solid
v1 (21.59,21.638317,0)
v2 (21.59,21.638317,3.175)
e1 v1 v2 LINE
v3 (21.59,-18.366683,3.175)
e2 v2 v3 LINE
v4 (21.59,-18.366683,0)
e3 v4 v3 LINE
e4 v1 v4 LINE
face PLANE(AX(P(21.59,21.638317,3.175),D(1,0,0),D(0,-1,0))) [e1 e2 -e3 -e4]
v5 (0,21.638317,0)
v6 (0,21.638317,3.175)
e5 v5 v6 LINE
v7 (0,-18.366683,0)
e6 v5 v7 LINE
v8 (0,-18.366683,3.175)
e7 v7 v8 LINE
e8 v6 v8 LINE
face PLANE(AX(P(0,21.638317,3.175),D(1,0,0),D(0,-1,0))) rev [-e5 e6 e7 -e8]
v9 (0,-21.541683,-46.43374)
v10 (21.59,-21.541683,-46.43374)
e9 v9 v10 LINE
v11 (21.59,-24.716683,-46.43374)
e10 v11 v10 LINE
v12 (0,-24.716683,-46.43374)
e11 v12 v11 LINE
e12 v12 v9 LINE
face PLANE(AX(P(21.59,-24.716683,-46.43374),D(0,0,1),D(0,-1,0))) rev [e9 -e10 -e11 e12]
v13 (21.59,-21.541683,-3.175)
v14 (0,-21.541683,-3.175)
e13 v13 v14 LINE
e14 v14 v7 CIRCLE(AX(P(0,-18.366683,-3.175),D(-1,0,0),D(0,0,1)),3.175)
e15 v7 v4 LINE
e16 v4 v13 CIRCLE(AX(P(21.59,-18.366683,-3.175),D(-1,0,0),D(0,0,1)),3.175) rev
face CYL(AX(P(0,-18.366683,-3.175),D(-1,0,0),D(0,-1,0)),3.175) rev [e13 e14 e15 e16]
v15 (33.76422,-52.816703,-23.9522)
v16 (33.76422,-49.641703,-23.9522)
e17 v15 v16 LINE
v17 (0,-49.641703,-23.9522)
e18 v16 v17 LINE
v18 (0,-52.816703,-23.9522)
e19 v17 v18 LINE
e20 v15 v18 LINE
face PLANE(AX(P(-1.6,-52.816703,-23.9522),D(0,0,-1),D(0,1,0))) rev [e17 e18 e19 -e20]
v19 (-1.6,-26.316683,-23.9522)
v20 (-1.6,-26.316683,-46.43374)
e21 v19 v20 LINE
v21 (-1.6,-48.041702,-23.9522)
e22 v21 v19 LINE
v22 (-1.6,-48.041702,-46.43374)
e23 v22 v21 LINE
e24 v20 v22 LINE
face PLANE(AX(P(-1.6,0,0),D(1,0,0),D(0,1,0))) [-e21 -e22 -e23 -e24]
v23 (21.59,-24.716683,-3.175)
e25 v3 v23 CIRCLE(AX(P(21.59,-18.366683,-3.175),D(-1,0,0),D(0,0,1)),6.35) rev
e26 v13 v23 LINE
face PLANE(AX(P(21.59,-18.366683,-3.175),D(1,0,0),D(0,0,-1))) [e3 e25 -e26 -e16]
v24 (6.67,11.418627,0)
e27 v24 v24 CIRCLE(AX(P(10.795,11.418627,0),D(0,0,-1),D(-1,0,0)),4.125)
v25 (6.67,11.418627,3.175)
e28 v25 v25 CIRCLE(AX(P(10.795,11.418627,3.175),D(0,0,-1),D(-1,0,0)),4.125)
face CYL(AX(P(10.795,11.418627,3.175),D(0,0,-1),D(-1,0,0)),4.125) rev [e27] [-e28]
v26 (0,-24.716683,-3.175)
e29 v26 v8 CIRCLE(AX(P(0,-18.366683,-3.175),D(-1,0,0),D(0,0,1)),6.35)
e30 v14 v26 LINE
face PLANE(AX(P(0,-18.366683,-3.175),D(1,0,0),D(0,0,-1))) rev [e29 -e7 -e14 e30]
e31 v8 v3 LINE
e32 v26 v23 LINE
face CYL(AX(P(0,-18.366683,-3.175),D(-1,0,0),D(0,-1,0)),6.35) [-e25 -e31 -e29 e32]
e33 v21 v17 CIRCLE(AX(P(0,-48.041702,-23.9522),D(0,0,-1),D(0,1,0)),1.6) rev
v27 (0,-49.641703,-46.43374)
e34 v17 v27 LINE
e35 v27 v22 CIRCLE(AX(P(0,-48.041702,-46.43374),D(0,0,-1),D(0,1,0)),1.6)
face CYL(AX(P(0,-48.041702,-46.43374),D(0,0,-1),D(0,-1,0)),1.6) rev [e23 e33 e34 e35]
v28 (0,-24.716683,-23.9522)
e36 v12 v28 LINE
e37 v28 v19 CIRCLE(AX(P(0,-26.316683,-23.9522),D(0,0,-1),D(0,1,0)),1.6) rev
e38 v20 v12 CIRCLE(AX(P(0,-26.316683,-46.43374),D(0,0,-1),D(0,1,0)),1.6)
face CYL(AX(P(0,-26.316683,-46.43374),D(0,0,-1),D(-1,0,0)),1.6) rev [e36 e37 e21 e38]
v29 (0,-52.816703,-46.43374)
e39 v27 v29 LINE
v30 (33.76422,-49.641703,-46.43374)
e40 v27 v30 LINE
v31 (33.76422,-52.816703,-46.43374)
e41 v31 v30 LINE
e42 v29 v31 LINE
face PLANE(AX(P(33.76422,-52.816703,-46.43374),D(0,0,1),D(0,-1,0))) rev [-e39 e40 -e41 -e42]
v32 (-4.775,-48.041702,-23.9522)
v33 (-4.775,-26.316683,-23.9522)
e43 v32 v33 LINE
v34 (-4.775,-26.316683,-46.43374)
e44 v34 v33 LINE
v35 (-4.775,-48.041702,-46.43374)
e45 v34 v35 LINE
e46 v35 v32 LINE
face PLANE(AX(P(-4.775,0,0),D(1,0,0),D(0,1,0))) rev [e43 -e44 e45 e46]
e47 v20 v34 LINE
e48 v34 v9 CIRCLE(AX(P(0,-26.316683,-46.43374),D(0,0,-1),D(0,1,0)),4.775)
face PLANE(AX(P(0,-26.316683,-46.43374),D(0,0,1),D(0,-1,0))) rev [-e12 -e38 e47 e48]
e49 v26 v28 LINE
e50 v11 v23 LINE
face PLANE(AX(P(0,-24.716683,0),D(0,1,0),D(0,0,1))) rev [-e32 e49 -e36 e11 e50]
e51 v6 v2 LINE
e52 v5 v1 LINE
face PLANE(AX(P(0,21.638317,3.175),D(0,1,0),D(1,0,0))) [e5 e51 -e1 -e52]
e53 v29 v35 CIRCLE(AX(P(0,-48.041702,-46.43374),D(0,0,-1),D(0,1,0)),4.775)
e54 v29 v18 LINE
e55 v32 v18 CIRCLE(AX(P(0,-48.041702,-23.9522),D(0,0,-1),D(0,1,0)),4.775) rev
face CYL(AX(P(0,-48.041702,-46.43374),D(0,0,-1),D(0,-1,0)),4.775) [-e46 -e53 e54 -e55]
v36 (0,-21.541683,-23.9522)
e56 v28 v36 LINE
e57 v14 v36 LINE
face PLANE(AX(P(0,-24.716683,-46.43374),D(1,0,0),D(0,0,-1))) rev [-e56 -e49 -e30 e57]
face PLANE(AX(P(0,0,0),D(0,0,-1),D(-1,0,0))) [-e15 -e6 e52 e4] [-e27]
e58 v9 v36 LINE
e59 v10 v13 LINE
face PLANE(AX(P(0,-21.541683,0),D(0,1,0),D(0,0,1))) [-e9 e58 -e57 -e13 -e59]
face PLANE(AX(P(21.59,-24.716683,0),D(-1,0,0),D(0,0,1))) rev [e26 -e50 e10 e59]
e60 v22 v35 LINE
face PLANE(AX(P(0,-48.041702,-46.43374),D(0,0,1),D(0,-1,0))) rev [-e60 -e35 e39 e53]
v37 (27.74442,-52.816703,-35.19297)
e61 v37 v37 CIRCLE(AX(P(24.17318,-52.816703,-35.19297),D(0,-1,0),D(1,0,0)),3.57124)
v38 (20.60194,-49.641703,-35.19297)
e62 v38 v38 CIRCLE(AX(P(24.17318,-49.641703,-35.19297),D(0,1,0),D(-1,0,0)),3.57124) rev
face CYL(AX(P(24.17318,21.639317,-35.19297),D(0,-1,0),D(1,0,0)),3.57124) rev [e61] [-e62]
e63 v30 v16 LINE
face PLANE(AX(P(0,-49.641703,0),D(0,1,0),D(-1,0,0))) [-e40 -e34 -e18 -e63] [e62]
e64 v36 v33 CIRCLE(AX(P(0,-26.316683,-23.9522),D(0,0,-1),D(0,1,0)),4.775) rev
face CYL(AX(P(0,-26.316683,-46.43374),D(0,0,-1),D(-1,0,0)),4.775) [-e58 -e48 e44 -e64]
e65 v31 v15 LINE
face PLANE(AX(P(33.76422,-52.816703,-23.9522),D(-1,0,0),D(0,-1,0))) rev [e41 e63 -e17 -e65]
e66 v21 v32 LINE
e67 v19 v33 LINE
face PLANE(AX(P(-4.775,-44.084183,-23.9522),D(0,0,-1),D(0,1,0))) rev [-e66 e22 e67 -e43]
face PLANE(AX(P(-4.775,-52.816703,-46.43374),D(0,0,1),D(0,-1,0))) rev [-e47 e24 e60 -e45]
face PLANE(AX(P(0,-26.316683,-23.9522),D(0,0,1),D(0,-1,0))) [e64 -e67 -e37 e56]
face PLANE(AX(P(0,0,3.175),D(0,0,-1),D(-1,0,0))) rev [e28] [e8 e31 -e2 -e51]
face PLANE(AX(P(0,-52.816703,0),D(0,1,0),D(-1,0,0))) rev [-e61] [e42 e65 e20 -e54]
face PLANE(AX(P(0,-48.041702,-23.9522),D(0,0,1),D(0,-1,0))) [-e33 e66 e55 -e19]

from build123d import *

# Parameters (mm, degrees)
SKETCH1_W                    = 21.59
SKETCH1_H                    = 43.18
SKETCH1_R                    = 4.124999878
BOSS_EXTRUDE1_DEPTH          = 3.175
EDGE_FLANGE1_STRIP_W         = 19.05
EDGE_FLANGE1_STRIP_H         = 3.175
EDGE_FLANGE1_STRIP_CUT_DEPTH = 21.59
EDGE_FLANGE1_DEPTH           = 21.59
EDGE_FLANGE2_DEPTH           = 22.48154
EDGE_FLANGE2_START           = 3.175
EDGE_FLANGE2_FLAT_DEPTH      = 3.175
EDGE_FLANGE3_STRIP_W         = 15.900000204
EDGE_FLANGE3_STRIP_H         = 3.175
EDGE_FLANGE3_STRIP_CUT_DEPTH = 22.48154
EDGE_FLANGE3_DEPTH           = 22.48154
CUT_EXTRUDE2_REACH           = 96.019
SKETCH11_R                   = 3.57124


# Sheet-metal steps are written as plain solids
with BuildPart() as part:
    # Sketch1 → Boss-Extrude1 (new body)
    with BuildSketch(Plane.XY):
        with Locations((10.795, 0.048317484)):
            Rectangle(SKETCH1_W, SKETCH1_H)
        with Locations(Location((10.795, 11.418627484, 0), (0, 0, 180))):
            Circle(SKETCH1_R, mode=Mode.SUBTRACT)
    extrude(amount=BOSS_EXTRUDE1_DEPTH)

    # Edge-Flange1 strip (across the edge) → Edge-Flange1 strip cut (cut)
    with BuildSketch(Plane(origin=(21.59, -21.541682516, 0), x_dir=(0, 1, 0), z_dir=(-1, 0, 0))):
        with Locations((-6.35, -1.5875)):
            Rectangle(EDGE_FLANGE1_STRIP_W, EDGE_FLANGE1_STRIP_H)
    extrude(amount=EDGE_FLANGE1_STRIP_CUT_DEPTH, mode=Mode.SUBTRACT)

    # Edge-Flange1 section (across the edge) → Edge-Flange1 (add)
    with BuildSketch(Plane(origin=(21.59, -21.541682516, 0), x_dir=(0, 1, 0), z_dir=(-1, 0, 0))):
        with BuildLine():
            Line((-3.175, 3.175), (-3.175, 46.43374))
            Line((-3.175, 46.43374), (0, 46.43374))
            Line((0, 46.43374), (0, 3.175))
            ThreePointArc((0, 3.175), (0.92993597, 0.92993597), (3.175, 0))
            Line((3.175, 0), (3.175, -3.175))
            ThreePointArc((3.175, -3.175), (-1.315128061, -1.315128061), (-3.175, 3.175))
        make_face()
    extrude(amount=EDGE_FLANGE1_DEPTH)

    # Edge-Flange2 bend section (across the edge) → Edge-Flange2 (add)
    with BuildSketch(Plane(origin=(-1.600000102, -24.716682516, -23.9522), x_dir=(1, 0, 0), z_dir=(0, 0, -1))):
        with BuildLine():
            Line((-3.175, 1.600000102), (0, 1.600000102))
            ThreePointArc((0, 1.600000102), (0.46862918, 0.46862918), (1.600000102, 0))
            Line((1.600000102, 0), (1.600000102, -3.175))
            ThreePointArc((1.600000102, -3.175), (-1.77643485, -1.77643485), (-3.175, 1.600000102))
        make_face()
    extrude(amount=EDGE_FLANGE2_DEPTH)

    # Edge-Flange2 profile (on flange) → Edge-Flange2 flat (add)
    with BuildSketch(Plane(origin=(-1.600000102, -24.716682516, 0), x_dir=(0, 0, -1), z_dir=(-1, 0, 0)).offset(EDGE_FLANGE2_START)):
        Polygon((23.9522, 28.10002), (23.9522, 19.3675), (23.9522, 1.600000102), (46.43374, 1.600000102), (46.43374, 28.10002), align=None)
    extrude(amount=-EDGE_FLANGE2_FLAT_DEPTH)

    # Edge-Flange3 strip (across the edge) → Edge-Flange3 strip cut (cut)
    with BuildSketch(Plane(origin=(-1.600000102, -52.816702516, -23.9522), x_dir=(0, 1, 0), z_dir=(0, 0, -1))):
        with Locations((-3.175, -1.5875)):
            Rectangle(EDGE_FLANGE3_STRIP_W, EDGE_FLANGE3_STRIP_H)
    extrude(amount=EDGE_FLANGE3_STRIP_CUT_DEPTH, mode=Mode.SUBTRACT)

    # Edge-Flange3 section (across the edge) → Edge-Flange3 (add)
    with BuildSketch(Plane(origin=(-1.600000102, -52.816702516, -23.9522), x_dir=(0, 1, 0), z_dir=(0, 0, -1))):
        with BuildLine():
            Line((0, 1.600000102), (0, 35.364220102))
            Line((0, 35.364220102), (3.175, 35.364220102))
            Line((3.175, 35.364220102), (3.175, 1.600000102))
            ThreePointArc((3.175, 1.600000102), (3.64362918, 0.46862918), (4.775000102, 0))
            Line((4.775000102, 0), (4.775000102, -3.175))
            ThreePointArc((4.775000102, -3.175), (1.39856515, -1.77643485), (0, 1.600000102))
        make_face()
    extrude(amount=EDGE_FLANGE3_DEPTH)

    # Sketch11 → Cut-Extrude2 (cut, up to next)
    with BuildSketch(Plane.XZ.offset(52.816702516), mode=Mode.PRIVATE) as cut_extrude2_sk1:
        with Locations((24.17318, -35.19297)):
            Circle(SKETCH11_R)
    cut_extrude2_tool1 = extrude(cut_extrude2_sk1.sketch, amount=-CUT_EXTRUDE2_REACH, mode=Mode.PRIVATE) & part.part
    add(cut_extrude2_tool1.solids().sort_by_distance((24.17318, -52.816703, -35.19297))[0], mode=Mode.SUBTRACT)


solid = part.part
